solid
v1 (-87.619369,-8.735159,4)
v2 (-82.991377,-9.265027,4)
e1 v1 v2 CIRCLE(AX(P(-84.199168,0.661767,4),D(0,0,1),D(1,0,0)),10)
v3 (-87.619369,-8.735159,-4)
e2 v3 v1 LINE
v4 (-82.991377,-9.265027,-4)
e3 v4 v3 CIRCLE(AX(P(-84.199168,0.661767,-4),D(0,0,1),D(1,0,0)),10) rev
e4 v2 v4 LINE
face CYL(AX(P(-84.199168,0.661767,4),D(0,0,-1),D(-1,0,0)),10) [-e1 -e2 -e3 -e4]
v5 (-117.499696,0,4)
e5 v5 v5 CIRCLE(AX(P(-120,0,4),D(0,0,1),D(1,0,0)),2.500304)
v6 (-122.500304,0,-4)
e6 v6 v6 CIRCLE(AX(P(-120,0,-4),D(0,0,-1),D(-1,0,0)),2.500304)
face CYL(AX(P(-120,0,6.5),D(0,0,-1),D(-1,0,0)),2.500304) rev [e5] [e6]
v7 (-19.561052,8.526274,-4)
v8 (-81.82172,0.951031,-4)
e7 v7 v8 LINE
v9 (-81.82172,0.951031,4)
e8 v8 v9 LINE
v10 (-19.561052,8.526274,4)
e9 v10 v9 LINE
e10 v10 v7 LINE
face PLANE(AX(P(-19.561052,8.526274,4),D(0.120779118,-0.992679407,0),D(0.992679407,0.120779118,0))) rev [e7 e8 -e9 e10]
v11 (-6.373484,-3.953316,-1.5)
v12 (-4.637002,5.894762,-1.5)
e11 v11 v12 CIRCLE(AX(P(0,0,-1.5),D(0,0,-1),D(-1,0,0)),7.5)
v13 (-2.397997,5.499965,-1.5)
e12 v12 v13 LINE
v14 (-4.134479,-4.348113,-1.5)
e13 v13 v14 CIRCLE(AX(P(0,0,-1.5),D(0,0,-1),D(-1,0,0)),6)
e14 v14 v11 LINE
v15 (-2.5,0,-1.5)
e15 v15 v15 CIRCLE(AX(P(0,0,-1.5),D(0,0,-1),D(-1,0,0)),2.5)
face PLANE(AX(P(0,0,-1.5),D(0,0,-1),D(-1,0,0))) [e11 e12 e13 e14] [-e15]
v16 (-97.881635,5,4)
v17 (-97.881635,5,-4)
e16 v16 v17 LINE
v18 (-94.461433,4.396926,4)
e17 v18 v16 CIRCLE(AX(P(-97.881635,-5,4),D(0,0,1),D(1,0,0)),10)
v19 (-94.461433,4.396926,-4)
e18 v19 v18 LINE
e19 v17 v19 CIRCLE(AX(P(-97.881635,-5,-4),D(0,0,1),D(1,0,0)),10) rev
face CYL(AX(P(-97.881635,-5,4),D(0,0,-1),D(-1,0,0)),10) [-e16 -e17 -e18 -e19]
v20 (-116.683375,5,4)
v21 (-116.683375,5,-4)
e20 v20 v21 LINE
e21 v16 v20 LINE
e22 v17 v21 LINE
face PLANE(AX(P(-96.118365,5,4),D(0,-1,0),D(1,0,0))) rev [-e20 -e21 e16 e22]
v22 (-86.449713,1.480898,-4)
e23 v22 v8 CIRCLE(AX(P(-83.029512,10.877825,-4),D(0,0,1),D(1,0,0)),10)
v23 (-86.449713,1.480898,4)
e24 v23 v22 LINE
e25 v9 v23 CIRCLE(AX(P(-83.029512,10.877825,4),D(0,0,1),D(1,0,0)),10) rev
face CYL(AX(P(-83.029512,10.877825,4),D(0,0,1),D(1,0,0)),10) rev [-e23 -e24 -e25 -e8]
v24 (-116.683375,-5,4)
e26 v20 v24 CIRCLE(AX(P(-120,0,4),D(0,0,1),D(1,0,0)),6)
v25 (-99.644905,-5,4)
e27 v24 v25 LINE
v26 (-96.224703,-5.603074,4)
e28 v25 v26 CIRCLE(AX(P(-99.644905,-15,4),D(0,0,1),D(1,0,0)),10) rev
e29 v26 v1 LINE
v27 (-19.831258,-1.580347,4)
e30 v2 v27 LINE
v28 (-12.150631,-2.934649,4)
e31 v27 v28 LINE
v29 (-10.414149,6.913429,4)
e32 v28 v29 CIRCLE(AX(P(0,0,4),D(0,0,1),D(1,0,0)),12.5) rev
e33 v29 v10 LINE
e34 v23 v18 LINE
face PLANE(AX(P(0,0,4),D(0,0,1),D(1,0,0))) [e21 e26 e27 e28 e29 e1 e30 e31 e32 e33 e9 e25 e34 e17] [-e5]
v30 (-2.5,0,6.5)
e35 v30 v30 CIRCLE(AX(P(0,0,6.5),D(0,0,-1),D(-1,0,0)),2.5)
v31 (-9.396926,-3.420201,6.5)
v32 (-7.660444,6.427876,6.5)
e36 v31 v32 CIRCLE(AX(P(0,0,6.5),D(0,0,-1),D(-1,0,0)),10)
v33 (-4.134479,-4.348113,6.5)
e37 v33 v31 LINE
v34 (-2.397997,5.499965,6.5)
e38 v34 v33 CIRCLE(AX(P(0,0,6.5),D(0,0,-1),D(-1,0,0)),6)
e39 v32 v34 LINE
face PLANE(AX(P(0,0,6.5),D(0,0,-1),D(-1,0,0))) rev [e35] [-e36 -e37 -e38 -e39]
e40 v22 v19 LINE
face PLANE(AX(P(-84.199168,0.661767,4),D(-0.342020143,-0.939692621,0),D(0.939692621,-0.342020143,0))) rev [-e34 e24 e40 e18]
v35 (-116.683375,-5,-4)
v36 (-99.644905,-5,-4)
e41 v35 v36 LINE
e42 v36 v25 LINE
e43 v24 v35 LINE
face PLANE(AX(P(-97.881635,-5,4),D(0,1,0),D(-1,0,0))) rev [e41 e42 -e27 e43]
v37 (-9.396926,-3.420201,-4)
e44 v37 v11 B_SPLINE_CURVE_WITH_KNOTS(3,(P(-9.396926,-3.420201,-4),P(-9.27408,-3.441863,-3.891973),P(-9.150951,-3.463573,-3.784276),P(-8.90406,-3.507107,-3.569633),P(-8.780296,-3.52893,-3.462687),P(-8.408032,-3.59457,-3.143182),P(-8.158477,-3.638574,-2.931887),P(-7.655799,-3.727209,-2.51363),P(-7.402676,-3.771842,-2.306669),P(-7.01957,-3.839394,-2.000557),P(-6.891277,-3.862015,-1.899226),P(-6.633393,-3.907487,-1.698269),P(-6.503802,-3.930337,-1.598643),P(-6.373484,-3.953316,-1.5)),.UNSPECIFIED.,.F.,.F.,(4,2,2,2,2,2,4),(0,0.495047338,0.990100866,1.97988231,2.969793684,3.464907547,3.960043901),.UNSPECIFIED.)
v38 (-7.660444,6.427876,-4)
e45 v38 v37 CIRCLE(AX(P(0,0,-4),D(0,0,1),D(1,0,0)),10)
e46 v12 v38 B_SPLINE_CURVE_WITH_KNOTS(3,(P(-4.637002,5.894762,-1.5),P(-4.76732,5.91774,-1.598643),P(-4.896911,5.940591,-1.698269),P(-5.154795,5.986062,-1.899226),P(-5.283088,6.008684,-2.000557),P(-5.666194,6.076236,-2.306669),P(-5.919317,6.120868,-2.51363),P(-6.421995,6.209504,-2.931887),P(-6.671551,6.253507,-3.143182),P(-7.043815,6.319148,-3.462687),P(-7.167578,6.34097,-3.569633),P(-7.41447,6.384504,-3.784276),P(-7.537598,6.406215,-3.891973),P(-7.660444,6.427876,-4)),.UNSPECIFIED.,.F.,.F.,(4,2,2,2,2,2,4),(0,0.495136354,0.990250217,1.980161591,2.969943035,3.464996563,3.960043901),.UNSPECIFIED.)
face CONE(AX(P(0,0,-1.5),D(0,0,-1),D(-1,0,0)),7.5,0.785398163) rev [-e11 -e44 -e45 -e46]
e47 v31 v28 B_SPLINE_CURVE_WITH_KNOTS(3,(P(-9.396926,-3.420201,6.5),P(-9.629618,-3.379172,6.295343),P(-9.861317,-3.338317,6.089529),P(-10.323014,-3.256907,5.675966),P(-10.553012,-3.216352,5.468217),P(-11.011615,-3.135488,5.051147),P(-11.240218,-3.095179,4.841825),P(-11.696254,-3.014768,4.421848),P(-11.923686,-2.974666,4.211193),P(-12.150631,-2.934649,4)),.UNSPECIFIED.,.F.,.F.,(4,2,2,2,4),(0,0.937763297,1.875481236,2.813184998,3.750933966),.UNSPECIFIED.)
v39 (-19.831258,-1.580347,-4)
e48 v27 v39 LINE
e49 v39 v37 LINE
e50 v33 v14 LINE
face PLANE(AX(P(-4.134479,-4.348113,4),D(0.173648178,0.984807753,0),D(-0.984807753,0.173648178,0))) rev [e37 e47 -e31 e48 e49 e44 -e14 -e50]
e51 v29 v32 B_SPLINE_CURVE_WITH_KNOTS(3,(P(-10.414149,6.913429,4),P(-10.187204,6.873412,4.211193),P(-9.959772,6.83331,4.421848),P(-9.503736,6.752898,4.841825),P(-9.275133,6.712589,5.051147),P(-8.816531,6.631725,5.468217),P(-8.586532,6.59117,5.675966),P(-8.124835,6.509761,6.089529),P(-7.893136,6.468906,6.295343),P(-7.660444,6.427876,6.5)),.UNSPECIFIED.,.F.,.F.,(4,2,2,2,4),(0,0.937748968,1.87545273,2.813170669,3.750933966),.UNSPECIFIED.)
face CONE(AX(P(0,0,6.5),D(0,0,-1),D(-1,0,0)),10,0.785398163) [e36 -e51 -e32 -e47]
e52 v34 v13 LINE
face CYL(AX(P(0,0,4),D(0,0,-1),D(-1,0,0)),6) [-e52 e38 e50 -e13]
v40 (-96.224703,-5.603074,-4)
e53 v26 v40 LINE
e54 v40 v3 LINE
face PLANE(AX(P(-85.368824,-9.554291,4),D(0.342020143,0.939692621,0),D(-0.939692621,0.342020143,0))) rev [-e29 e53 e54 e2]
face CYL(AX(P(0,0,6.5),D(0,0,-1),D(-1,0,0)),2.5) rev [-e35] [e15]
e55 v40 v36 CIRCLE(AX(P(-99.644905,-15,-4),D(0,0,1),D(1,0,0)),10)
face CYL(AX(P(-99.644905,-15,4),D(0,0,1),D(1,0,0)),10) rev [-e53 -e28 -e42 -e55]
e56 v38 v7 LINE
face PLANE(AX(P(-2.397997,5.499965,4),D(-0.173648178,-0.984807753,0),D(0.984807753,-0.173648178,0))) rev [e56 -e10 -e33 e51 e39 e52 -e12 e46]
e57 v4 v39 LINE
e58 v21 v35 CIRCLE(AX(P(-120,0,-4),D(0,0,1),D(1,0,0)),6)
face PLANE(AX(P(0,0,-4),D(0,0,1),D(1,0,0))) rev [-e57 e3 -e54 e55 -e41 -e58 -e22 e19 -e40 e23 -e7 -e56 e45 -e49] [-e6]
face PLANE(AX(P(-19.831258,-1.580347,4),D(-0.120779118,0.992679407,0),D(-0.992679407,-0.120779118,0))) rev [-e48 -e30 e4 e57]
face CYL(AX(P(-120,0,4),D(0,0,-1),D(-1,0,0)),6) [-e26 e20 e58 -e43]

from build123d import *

# Parameters (mm, degrees)
EXTRUDE_1_DEPTH          = 4
SKETCH_2_R               = 10
CUT_EXTRUDE_1_DEPTH      = 2.5
EXTRUDE_4_DEPTH          = 2.5
CUT_EXTRUDE_2_DEPTH      = 127.614708745
CUT_EXTRUDE_2_DEPTH_BACK = 127.614708745
SKETCH_4_R               = 2.5
SKETCH_4_R_2             = 2.500304397
CHAMFER_1_SIZE           = 2.5
CHAMFER_2_SIZE           = 2.5
FILLET_1_R               = 10


with BuildPart() as part:
    # 草图1 → 凸台-拉伸1 (new, symmetric)
    with BuildSketch(Plane.XY):
        with BuildLine():
            Line((-2.397996919, 5.499964616), (-19.561052391, 8.526274367))
            Line((-19.561052391, 8.526274367), (-84.199167791, 0.661766964))
            Line((-84.199167791, 0.661766964), (-96.118365096, 5))
            Line((-96.118365096, 5), (-116.68337521, 5))
            ThreePointArc((-116.68337521, 5), (-126, 0), (-116.68337521, -5))
            Line((-116.68337521, -5), (-97.881634904, -5))
            Line((-97.881634904, -5), (-85.368824069, -9.554290691))
            Line((-85.368824069, -9.554290691), (-19.831257729, -1.58034726))
            Line((-19.831257729, -1.58034726), (-4.134478696, -4.348112914))
            ThreePointArc((-4.134478696, -4.348112914), (5.908846518, -1.041889066), (-2.397996919, 5.499964616))
        make_face()
    extrude(amount=EXTRUDE_1_DEPTH, both=True)

    # 草图2 → 切除-拉伸1 (cut)
    with BuildSketch(Plane(origin=(0, 0, -4), x_dir=(-1, 0, 0), z_dir=(0, 0, -1))):
        Circle(SKETCH_2_R)
    extrude(amount=-CUT_EXTRUDE_1_DEPTH, mode=Mode.SUBTRACT)

    # 草图3 → 凸台-拉伸4 (add)
    with BuildSketch(Plane.XY.offset(4)):
        with BuildLine():
            Line((-2.397996919, 5.499964616), (-7.660444431, 6.427876097))
            ThreePointArc((-7.660444431, 6.427876097), (-9.84807753, 1.736481777), (-9.396926208, -3.420201433))
            Line((-9.396926208, -3.420201433), (-4.134478696, -4.348112914))
            ThreePointArc((-4.134478696, -4.348112914), (5.908846518, -1.041889066), (-2.397996919, 5.499964616))
        make_face()
    extrude(amount=EXTRUDE_4_DEPTH)

    # 草图4 → 切除-拉伸2 (cut, two sides: drawn at the far end of the back side and taken through both)
    with BuildSketch(Plane(origin=(0, 0, -1.5), x_dir=(-1, 0, 0), z_dir=(0, 0, -1)).offset(-CUT_EXTRUDE_2_DEPTH_BACK)):
        Circle(SKETCH_4_R)
        with Locations((120, 0)):
            Circle(SKETCH_4_R_2)
    extrude(amount=CUT_EXTRUDE_2_DEPTH + CUT_EXTRUDE_2_DEPTH_BACK, mode=Mode.SUBTRACT)

    # 倒角1
    chamfer_1_edges = [part.edges().sort_by_distance(p)[0] for p in [
        (-9.84807753, 1.736481777, 4),
    ]]
    chamfer(chamfer_1_edges, length=CHAMFER_1_SIZE - 0.0001)  # a hair under: the kernel refuses the full size

    # 倒角2
    chamfer_2_edges = [part.edges().sort_by_distance(p)[0] for p in [
        (-9.84807753, 1.736481777, -1.5),
    ]]
    chamfer(chamfer_2_edges, length=CHAMFER_2_SIZE - 0.0001)  # a hair under: the kernel refuses the full size

    # 圆角1
    fillet_1_edges = [part.edges().sort_by_distance(p)[0] for p in [
        (-85.368824069, -9.554290691, 0),
        (-97.881634904, -5, 0),
        (-96.118365096, 5, 0),
        (-84.199167791, 0.661766964, 0),
    ]]
    fillet(fillet_1_edges, radius=FILLET_1_R)


solid = part.part
